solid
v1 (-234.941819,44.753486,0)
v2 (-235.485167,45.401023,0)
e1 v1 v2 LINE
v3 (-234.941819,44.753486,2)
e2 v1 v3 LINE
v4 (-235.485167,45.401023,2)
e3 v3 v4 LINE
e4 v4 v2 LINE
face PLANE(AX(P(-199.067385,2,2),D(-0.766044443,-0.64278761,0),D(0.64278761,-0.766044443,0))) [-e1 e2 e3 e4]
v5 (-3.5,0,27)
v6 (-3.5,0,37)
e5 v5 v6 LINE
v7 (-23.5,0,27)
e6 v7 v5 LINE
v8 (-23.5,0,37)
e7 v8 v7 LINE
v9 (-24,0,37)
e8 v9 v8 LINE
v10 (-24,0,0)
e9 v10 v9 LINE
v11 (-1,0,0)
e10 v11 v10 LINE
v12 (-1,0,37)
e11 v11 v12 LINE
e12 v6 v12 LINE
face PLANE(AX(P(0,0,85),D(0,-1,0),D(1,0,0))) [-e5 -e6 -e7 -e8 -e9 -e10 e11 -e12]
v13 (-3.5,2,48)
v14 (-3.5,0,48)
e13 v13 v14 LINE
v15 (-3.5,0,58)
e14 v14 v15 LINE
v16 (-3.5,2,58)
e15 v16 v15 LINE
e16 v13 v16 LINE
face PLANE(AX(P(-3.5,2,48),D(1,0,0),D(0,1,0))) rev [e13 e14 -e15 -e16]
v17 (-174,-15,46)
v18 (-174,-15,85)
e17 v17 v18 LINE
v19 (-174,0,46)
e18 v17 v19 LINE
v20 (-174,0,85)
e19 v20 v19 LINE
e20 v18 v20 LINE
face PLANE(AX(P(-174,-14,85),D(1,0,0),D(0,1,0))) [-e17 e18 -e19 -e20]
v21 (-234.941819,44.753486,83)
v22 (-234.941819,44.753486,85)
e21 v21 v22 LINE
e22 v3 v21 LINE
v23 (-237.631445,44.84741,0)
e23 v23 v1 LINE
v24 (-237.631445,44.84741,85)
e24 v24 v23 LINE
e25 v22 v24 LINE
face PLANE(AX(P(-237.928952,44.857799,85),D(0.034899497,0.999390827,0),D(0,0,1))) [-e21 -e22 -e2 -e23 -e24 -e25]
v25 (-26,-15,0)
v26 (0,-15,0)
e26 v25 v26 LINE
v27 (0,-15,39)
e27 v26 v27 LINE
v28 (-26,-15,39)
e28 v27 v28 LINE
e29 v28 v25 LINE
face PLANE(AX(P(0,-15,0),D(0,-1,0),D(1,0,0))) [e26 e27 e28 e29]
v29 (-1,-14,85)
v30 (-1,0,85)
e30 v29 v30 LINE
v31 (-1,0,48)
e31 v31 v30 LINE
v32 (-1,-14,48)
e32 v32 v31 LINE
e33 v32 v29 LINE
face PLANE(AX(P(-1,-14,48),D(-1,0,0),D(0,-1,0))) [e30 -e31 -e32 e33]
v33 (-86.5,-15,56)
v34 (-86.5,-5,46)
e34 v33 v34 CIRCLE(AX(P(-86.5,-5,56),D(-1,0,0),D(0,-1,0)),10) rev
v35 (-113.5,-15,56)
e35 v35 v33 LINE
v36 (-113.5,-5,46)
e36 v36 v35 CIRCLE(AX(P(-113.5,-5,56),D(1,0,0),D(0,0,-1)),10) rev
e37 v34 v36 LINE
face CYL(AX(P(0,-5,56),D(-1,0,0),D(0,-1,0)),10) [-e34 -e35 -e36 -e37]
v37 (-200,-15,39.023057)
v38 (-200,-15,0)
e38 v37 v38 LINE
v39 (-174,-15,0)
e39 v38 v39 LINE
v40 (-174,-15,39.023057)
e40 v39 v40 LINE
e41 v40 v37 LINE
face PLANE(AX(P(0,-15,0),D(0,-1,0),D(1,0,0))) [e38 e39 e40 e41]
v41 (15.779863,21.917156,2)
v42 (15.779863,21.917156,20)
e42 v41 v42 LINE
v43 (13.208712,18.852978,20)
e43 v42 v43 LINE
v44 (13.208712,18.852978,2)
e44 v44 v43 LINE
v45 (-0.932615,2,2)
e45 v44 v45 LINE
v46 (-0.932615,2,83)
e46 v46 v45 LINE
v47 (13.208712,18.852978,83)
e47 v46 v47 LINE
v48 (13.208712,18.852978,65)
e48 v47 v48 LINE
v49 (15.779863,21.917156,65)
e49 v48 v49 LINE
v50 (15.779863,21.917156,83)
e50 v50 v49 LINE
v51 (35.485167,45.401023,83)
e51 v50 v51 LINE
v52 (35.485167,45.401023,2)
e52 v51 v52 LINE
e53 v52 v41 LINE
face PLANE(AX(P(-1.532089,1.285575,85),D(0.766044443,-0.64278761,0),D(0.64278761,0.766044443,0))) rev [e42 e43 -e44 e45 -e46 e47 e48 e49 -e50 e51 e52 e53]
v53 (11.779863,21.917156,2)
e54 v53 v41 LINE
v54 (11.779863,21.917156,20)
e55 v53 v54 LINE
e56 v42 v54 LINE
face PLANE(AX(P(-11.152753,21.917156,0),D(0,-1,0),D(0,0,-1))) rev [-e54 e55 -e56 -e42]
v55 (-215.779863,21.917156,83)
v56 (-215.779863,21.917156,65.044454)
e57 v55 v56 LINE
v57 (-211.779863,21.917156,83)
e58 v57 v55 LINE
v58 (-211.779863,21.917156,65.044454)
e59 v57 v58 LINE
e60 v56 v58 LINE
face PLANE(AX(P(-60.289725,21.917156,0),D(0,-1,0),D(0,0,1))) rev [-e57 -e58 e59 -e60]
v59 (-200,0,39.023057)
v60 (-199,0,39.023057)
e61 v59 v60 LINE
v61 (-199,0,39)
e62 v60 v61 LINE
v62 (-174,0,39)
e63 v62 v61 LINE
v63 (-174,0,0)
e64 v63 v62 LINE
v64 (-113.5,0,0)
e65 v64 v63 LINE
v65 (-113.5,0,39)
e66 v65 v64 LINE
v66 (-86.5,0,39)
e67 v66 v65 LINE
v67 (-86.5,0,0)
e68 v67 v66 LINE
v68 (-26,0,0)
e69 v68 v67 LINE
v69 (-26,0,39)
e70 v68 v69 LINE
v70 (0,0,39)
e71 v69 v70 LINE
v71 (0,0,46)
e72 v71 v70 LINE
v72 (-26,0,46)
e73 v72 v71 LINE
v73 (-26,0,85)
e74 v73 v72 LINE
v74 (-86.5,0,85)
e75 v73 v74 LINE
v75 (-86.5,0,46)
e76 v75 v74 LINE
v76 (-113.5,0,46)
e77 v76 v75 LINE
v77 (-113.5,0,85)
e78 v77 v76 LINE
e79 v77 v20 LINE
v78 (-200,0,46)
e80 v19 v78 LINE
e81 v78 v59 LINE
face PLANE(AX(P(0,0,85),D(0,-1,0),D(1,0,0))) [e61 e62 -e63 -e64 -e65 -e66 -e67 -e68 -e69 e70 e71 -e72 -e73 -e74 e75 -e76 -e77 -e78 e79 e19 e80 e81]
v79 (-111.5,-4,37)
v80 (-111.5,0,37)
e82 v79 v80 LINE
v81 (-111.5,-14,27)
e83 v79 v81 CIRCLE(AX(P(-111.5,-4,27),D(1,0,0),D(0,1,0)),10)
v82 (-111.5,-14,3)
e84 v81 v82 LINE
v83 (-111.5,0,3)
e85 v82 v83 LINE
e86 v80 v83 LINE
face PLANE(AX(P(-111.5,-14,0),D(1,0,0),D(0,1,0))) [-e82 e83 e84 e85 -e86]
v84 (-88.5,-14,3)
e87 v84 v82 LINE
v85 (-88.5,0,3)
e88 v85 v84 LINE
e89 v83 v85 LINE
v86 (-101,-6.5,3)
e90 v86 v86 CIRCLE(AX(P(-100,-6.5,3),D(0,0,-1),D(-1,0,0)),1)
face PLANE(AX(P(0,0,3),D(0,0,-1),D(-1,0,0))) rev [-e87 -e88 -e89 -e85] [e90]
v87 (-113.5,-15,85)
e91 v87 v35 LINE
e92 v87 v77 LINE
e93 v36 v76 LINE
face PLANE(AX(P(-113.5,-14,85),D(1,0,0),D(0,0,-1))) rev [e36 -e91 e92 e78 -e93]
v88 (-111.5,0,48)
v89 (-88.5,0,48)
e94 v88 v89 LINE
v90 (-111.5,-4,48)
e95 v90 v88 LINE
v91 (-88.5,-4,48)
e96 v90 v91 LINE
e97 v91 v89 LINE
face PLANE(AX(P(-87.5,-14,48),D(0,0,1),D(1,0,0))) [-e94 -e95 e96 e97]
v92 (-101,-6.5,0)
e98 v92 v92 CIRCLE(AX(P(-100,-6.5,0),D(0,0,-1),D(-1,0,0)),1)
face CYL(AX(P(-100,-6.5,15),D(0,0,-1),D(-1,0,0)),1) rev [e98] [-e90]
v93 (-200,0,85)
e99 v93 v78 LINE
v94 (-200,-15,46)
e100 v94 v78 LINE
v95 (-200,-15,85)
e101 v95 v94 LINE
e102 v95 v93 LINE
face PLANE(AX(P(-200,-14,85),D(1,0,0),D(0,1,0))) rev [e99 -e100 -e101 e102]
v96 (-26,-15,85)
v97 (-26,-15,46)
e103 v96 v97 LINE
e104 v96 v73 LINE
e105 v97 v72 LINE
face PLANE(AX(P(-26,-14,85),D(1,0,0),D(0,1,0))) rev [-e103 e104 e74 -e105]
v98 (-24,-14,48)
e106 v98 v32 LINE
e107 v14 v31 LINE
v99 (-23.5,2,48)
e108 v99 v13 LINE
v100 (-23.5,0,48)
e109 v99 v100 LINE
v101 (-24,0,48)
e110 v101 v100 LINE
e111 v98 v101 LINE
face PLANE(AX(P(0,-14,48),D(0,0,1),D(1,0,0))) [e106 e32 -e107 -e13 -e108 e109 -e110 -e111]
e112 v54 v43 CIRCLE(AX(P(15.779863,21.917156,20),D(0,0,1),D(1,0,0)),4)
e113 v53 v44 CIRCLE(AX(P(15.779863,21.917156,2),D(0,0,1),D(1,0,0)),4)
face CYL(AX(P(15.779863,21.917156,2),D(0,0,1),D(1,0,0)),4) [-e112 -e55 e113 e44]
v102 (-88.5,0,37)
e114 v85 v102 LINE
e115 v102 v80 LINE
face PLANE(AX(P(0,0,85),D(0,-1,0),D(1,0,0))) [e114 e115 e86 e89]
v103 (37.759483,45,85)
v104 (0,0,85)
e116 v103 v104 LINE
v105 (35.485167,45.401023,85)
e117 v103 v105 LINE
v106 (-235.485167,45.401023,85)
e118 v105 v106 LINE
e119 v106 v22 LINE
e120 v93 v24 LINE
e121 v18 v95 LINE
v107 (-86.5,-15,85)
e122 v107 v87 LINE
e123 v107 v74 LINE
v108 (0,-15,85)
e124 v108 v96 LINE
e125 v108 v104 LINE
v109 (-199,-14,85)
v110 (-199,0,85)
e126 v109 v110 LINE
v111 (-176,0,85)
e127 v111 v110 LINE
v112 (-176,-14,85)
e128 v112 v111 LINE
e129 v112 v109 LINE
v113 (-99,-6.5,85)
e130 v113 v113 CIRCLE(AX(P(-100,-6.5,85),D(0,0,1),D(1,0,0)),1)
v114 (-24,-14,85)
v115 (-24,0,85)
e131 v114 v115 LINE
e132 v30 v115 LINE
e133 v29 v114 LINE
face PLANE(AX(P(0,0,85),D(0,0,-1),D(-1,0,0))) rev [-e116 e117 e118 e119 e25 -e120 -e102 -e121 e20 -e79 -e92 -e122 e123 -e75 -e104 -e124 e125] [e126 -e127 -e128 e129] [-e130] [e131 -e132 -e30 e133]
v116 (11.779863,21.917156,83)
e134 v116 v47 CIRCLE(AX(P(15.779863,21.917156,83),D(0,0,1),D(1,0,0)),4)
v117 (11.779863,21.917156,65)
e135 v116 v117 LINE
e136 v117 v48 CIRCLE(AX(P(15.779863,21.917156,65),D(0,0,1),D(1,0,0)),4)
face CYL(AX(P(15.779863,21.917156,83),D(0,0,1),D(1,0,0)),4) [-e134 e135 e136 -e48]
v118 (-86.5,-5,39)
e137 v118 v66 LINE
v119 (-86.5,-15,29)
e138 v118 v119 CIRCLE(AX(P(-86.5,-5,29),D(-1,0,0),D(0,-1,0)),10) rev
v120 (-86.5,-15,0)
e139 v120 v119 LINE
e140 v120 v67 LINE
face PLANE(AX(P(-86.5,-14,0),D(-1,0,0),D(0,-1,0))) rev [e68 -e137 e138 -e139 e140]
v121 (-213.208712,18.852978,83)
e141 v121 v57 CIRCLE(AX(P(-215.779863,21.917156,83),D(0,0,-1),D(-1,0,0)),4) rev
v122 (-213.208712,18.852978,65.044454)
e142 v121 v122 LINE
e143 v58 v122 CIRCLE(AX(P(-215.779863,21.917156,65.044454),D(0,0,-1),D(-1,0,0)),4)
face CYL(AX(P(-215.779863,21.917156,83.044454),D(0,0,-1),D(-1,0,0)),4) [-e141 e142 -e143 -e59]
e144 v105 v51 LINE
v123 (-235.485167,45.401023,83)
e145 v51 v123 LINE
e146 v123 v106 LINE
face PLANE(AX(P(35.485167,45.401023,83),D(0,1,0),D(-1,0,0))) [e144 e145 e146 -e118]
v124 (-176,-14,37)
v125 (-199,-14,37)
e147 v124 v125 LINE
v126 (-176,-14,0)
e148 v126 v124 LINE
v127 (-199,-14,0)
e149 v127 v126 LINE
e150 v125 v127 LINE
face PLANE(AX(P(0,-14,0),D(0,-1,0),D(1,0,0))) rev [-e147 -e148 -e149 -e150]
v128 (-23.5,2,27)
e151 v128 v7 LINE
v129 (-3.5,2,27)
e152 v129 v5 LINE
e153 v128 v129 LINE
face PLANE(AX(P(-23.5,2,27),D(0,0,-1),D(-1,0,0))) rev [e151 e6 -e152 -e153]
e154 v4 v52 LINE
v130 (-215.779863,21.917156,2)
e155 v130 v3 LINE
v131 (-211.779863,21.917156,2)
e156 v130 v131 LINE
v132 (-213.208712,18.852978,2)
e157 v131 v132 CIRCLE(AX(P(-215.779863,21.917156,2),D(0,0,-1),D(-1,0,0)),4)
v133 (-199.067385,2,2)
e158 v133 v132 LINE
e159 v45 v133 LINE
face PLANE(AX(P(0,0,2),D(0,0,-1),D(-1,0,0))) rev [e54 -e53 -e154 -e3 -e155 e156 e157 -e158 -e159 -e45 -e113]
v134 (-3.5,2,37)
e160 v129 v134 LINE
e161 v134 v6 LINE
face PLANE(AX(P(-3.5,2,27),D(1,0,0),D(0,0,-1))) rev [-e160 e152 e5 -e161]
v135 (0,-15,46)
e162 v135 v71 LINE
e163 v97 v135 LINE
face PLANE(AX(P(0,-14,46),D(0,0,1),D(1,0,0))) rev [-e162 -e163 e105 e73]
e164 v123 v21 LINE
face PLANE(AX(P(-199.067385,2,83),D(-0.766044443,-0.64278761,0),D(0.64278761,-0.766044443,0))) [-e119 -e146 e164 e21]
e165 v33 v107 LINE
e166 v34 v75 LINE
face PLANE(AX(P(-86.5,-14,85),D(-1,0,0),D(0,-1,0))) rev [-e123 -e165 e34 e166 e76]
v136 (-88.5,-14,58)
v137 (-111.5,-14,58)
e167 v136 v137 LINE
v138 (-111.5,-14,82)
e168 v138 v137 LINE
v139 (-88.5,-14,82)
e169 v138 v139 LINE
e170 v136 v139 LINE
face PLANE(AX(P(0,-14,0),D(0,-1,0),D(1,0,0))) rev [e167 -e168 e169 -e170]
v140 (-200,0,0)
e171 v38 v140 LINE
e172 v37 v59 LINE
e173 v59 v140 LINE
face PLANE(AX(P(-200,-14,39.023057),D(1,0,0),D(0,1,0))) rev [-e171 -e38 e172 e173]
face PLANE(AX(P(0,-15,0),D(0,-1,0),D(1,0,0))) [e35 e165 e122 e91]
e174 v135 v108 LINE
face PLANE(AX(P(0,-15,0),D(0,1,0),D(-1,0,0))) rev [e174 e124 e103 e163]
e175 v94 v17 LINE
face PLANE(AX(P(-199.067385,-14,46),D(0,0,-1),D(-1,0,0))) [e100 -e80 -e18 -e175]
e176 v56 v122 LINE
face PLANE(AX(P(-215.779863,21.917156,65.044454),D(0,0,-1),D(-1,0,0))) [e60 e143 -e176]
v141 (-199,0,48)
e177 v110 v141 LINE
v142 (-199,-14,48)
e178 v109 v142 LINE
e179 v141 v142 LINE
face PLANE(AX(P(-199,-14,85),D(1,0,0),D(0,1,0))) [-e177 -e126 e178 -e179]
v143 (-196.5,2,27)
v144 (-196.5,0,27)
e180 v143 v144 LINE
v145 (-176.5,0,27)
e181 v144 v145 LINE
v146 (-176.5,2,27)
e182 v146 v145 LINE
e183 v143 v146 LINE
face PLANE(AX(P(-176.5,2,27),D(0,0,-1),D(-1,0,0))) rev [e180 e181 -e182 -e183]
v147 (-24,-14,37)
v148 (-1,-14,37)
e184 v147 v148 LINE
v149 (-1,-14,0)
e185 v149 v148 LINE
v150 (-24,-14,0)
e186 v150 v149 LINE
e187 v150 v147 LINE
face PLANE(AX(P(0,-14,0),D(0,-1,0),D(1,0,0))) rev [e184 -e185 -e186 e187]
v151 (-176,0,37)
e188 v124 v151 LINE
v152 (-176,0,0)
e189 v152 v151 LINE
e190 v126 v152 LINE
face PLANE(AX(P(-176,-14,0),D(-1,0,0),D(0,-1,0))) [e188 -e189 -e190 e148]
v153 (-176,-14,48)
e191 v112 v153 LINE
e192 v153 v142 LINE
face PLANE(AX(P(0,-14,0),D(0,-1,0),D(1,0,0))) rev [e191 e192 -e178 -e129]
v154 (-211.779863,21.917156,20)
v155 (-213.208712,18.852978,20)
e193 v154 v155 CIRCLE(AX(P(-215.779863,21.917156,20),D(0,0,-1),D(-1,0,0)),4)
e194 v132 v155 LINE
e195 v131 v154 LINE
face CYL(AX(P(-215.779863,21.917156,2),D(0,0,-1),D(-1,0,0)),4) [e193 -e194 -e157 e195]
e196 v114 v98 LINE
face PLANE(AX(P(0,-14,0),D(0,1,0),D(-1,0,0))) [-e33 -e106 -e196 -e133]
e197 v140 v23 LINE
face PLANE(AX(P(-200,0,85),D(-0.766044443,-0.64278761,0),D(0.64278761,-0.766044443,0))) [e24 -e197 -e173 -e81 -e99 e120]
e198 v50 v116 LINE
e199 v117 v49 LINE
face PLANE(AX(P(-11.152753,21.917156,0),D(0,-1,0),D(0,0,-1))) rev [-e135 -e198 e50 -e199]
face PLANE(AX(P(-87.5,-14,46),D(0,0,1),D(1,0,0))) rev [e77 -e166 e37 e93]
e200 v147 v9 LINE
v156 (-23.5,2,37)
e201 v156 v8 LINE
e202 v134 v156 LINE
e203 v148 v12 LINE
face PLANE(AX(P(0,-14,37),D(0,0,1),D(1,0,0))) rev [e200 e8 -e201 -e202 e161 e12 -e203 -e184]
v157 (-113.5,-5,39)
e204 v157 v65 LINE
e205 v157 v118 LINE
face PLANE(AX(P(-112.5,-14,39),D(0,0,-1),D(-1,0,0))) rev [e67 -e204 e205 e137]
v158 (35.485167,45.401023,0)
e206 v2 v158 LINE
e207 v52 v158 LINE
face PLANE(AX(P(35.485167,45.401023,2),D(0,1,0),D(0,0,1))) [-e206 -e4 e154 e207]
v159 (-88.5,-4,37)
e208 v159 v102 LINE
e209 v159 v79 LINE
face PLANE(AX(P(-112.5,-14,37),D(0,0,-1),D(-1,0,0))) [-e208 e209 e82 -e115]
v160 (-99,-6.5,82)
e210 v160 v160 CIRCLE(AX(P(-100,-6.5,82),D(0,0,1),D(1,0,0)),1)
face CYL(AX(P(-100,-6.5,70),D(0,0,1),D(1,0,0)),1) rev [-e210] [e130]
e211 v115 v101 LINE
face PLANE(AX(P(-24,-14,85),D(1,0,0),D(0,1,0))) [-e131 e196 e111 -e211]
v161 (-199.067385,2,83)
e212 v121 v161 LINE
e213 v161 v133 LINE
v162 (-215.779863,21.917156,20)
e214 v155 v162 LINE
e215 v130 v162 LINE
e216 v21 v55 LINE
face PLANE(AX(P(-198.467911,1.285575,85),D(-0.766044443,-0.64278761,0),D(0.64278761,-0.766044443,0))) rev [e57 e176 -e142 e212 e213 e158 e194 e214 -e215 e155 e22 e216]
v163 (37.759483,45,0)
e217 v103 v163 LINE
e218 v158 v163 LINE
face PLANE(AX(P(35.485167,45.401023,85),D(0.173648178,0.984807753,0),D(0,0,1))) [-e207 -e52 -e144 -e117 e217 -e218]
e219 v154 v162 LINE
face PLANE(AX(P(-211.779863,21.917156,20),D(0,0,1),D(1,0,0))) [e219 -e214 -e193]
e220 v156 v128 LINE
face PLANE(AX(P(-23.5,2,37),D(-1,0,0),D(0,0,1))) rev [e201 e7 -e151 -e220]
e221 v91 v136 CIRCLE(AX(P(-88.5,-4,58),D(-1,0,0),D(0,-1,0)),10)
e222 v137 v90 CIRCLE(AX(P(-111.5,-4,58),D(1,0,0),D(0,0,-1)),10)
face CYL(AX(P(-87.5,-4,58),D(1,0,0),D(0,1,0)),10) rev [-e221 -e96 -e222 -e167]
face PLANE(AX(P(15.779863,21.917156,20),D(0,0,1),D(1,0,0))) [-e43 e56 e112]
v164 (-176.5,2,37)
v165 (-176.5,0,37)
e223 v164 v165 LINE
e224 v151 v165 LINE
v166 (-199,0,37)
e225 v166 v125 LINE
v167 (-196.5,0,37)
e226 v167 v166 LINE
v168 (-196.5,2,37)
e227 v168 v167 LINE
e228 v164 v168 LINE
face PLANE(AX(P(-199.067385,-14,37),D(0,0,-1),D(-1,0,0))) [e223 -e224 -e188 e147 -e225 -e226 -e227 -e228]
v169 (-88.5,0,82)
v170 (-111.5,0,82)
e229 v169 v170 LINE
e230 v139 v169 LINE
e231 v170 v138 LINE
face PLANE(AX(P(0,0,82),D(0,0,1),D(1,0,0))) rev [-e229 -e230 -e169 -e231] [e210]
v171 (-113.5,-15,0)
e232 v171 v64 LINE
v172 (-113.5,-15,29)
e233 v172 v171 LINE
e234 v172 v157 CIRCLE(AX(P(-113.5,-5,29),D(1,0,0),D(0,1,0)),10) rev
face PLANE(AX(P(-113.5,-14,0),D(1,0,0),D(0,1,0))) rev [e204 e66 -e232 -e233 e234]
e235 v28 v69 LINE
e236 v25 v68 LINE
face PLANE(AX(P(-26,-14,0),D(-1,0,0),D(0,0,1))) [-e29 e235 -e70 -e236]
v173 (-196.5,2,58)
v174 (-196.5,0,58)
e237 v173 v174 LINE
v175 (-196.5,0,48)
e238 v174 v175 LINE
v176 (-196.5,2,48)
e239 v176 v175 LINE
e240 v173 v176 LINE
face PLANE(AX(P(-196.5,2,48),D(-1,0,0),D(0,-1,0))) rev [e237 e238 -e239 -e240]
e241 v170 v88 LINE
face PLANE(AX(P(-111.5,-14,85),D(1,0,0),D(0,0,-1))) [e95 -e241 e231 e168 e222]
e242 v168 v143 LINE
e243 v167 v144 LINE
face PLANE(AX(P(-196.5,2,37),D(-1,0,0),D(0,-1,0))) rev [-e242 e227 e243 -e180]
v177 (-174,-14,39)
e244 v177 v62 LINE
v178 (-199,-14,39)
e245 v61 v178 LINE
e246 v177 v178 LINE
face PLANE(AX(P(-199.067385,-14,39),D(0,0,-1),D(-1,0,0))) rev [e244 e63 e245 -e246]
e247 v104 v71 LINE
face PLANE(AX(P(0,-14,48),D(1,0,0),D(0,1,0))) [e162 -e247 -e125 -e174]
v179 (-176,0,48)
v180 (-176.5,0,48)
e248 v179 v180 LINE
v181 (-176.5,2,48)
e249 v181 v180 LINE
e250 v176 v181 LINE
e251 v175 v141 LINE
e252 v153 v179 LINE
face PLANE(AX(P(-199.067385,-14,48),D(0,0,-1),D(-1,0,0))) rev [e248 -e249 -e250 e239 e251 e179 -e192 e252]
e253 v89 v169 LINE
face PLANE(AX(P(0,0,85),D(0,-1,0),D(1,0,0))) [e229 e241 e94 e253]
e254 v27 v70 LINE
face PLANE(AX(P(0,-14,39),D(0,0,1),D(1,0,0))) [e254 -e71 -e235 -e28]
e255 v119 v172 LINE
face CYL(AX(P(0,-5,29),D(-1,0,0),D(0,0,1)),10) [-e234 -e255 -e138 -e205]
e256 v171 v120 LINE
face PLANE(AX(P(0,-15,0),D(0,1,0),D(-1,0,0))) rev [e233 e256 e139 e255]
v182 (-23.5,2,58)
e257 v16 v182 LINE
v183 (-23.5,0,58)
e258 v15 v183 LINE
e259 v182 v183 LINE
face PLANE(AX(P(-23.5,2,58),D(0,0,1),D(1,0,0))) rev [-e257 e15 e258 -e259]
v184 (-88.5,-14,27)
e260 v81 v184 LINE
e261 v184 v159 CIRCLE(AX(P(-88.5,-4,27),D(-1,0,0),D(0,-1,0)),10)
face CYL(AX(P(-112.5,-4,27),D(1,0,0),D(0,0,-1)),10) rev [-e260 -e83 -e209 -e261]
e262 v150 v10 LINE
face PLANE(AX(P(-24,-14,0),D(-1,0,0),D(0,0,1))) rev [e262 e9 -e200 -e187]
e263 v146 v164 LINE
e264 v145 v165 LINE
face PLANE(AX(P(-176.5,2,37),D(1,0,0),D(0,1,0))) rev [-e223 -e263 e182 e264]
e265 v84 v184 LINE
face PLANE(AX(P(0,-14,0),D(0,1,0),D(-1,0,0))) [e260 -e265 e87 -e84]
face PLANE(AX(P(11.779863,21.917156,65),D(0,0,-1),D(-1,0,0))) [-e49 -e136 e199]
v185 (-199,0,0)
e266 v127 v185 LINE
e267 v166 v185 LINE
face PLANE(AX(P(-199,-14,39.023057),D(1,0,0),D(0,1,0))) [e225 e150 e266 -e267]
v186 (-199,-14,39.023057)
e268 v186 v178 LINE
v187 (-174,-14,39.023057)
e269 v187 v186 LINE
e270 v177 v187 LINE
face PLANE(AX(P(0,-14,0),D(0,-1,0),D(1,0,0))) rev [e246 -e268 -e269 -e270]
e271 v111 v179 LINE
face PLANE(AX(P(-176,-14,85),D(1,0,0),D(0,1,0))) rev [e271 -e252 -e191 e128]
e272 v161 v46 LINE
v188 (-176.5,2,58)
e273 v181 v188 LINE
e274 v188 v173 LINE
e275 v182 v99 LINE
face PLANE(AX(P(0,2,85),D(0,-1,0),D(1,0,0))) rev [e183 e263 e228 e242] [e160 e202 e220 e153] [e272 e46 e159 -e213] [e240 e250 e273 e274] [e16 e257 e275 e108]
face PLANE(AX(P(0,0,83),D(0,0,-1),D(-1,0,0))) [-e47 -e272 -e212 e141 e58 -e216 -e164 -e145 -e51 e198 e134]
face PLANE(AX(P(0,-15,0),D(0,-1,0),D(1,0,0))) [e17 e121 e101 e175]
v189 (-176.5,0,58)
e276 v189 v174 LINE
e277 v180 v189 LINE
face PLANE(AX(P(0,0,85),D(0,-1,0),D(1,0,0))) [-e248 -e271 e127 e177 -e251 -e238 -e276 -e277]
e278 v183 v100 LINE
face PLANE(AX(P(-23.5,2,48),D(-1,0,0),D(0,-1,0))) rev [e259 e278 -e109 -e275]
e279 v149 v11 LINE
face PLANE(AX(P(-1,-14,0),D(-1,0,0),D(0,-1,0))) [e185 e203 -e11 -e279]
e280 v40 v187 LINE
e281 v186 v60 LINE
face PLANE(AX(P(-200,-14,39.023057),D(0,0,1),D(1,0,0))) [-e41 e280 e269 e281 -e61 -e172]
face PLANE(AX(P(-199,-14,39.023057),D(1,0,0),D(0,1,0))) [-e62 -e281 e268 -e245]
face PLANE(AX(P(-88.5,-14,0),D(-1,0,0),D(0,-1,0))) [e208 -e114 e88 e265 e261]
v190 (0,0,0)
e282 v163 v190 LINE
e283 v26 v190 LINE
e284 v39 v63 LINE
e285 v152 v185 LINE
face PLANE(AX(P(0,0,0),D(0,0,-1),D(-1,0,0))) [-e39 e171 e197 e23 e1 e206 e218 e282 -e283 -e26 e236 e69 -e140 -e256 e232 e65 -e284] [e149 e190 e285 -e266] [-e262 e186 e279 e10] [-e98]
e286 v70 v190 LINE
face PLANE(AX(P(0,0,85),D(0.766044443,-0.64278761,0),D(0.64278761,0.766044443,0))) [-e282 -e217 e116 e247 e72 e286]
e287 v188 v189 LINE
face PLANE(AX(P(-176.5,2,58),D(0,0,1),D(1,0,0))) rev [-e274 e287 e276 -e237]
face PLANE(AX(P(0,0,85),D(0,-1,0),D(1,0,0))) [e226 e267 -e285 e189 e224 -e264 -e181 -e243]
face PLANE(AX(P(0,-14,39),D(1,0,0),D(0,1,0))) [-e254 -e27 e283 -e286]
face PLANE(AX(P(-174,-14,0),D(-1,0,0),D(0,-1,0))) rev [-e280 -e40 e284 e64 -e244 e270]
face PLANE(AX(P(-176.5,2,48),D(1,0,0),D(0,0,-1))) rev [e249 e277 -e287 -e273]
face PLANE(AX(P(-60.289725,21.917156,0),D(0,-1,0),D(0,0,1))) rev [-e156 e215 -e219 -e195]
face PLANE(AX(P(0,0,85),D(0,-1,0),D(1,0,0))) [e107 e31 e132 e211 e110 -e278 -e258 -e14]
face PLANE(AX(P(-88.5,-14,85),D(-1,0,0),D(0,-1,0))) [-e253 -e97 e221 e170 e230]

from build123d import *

# Parameters (mm, degrees)
EXTRU_MINCE3_DEPTH       = 85
EXTRU_MINCE4_DEPTH       = 14
ESQUISSE3_W              = 1
ESQUISSE3_H              = 39.023056592
EXTRU_MINCE5_DEPTH       = 14
ESQUISSE4_W              = 1
ESQUISSE4_H              = 39
EXTRU_MINCE6_DEPTH       = 14
ESQUISSE5_W              = 1
ESQUISSE5_H              = 37
EXTRU_MINCE7_DEPTH       = 14
ESQUISSE6_W              = 1
ESQUISSE6_H              = 37
EXTRU_MINCE8_DEPTH       = 14
ESQUISSE9_W              = 26
ESQUISSE9_H              = 39.023056592
ESQUISSE9_H_2            = 39
ESQUISSE9_W_2            = 27
BOSS_EXTRU_2_DEPTH       = 1
CONG_1_R                 = 10
CONG_2_R                 = 10
CONG_3_R                 = 10
CONG_4_R                 = 10
ESQUISSE10_W             = 23
ESQUISSE10_H             = 14
BOSS_EXTRU_3_DEPTH       = 3
ESQUISSE11_W             = 23
ESQUISSE11_H             = 14
BOSS_EXTRU_4_DEPTH       = 3
ESQUISSE14_R             = 1
ENL_V_MAT_EXTRU_2_DEPTH  = 15
ENL_V_START              = -15
ESQUISSE15_R             = 1
ENL_V_MAT_EXTRU_4_DEPTH  = 15
CHANFREIN2_SIZE2         = 1.154700538
CHANFREIN2_SIZE          = 2
CHANFREIN4_SIZE          = 2
CHANFREIN4_SIZE_2        = 2.22122503
BOSS_EXTRU_8_DEPTH       = 2
BOSS_EXTRU_9_DEPTH       = 2
ESQUISSE23_W             = 20
ESQUISSE23_H             = 10
ENL_V_MAT_EXTRU_7_DEPTH  = 2
ESQUISSE24_W             = 20
ESQUISSE24_H             = 10
ENL_V_MAT_EXTRU_9_DEPTH  = 2
ESQUISSE25_W             = 20
ESQUISSE25_H             = 10
ENL_V_MAT_EXTRU_11_DEPTH = 2
ESQUISSE26_W             = 20
ESQUISSE26_H             = 10
ENL_V_MAT_EXTRU_13_DEPTH = 2
ESQUISSE28_W             = 18
ESQUISSE28_H             = 4
R_VOL_MINCE9_ANGLE       = 50
ESQUISSE29_W             = 18
ESQUISSE29_H             = 4
R_VOL_MINCE10_ANGLE      = 50
ESQUISSE31_W             = 18
ESQUISSE31_H             = 4
R_VOL_MINCE11_ANGLE      = 50
ESQUISSE32_W             = 18
ESQUISSE32_H             = 4
R_VOL_MINCE12_ANGLE      = 50


# Some blends are built 0.0001 mm under size
with BuildPart() as part:
    # Esquisse1 → Extru.-Mince3 (new body)
    with BuildSketch(Plane.XY):
        Polygon((37.759483403, 45), (0, 0), (-200, 0), (-237.759483403, 45), (-236.227394517, 46.285575219), (-199.067384684, 2), (-0.932615316, 2), (36.227394517, 46.285575219), align=None)
    extrude(amount=EXTRU_MINCE3_DEPTH)

    # Esquisse2 → Extru.-Mince4 (add)
    with BuildSketch(Plane(origin=(0, 0, 0), x_dir=(-1, 0, 0), z_dir=(0, -1, 0))):
        Polygon((199.067384684, -46), (174, -46), (174, -85), (176, -85), (176, -48), (199.067384684, -48), align=None)
        Polygon((0, -48), (24, -48), (24, -85), (26, -85), (26, -46), (0, -46), align=None)
        Polygon((88.5, -85), (88.5, -48), (111.5, -48), (111.5, -85), (113.5, -85), (113.5, -46), (86.5, -46), (86.5, -85), align=None)
        Polygon((199.067384684, -37), (176, -37), (176, 0), (174, 0), (174, -39), (199.067384684, -39), align=None)
        Polygon((111.5, 0), (111.5, -37), (88.5, -37), (88.5, 0), (86.5, 0), (86.5, -39), (113.5, -39), (113.5, 0), align=None)
        Polygon((0, -39), (26, -39), (26, 0), (24, 0), (24, -37), (0, -37), align=None)
    extrude(amount=EXTRU_MINCE4_DEPTH)

    # Esquisse3 → Extru.-Mince5 (add)
    with BuildSketch(Plane(origin=(0, 0, 0), x_dir=(-1, 0, 0), z_dir=(0, -1, 0))):
        with Locations((199.5, -19.511528296)):
            Rectangle(ESQUISSE3_W, ESQUISSE3_H)
    extrude(amount=EXTRU_MINCE5_DEPTH)

    # Esquisse4 → Extru.-Mince6 (add)
    with BuildSketch(Plane.XZ):
        with Locations((-199.5, 65.5)):
            Rectangle(ESQUISSE4_W, ESQUISSE4_H)
    extrude(amount=EXTRU_MINCE6_DEPTH)

    # Esquisse5 → Extru.-Mince7 (add)
    with BuildSketch(Plane(origin=(0, 0, 0), x_dir=(-1, 0, 0), z_dir=(0, -1, 0))):
        with Locations((0.5, -18.5)):
            Rectangle(ESQUISSE5_W, ESQUISSE5_H)
    extrude(amount=EXTRU_MINCE7_DEPTH)

    # Esquisse6 → Extru.-Mince8 (add)
    with BuildSketch(Plane(origin=(0, 0, 0), x_dir=(-1, 0, 0), z_dir=(0, -1, 0))):
        with Locations((0.5, -66.5)):
            Rectangle(ESQUISSE6_W, ESQUISSE6_H)
    extrude(amount=EXTRU_MINCE8_DEPTH)

    # Esquisse9 → Boss.-Extru.2 (add)
    with BuildSketch(Plane(origin=(0, -14, 0), x_dir=(-1, 0, 0), z_dir=(0, -1, 0))):
        with Locations((187, -19.511528296)):
            Rectangle(ESQUISSE9_W, ESQUISSE9_H)
        with Locations((187, -65.5)):
            Rectangle(ESQUISSE9_W, ESQUISSE9_H_2)
        with Locations((100, -65.5)):
            Rectangle(ESQUISSE9_W_2, ESQUISSE9_H_2)
        with Locations((100, -19.5)):
            Rectangle(ESQUISSE9_W_2, ESQUISSE9_H_2)
        with Locations((13, -65.5)):
            Rectangle(ESQUISSE9_W, ESQUISSE9_H_2)
        with Locations((13, -19.5)):
            Rectangle(ESQUISSE9_W, ESQUISSE9_H_2)
    extrude(amount=BOSS_EXTRU_2_DEPTH)

    # Congé1
    cong_1_edges = [part.edges().sort_by_distance(p)[0] for p in [
        (-100, -15, 39),
    ]]
    fillet(cong_1_edges, radius=CONG_1_R)

    # Congé2
    cong_2_edges = [part.edges().sort_by_distance(p)[0] for p in [
        (-100, -14, 37),
    ]]
    fillet(cong_2_edges, radius=CONG_2_R)

    # Congé3
    cong_3_edges = [part.edges().sort_by_distance(p)[0] for p in [
        (-100, -15, 46),
    ]]
    fillet(cong_3_edges, radius=CONG_3_R)

    # Congé4
    cong_4_edges = [part.edges().sort_by_distance(p)[0] for p in [
        (-100, -14, 48),
    ]]
    fillet(cong_4_edges, radius=CONG_4_R)

    # Esquisse10 → Boss.-Extru.3 (add)
    with BuildSketch(Plane.XY.offset(85)):
        with Locations((-100, -7)):
            Rectangle(ESQUISSE10_W, ESQUISSE10_H)
    extrude(amount=-BOSS_EXTRU_3_DEPTH)

    # Esquisse11 → Boss.-Extru.4 (add)
    with BuildSketch(Plane(origin=(0, 0, 0), x_dir=(-1, 0, 0), z_dir=(0, 0, -1))):
        with Locations((100, -7)):
            Rectangle(ESQUISSE11_W, ESQUISSE11_H)
    extrude(amount=-BOSS_EXTRU_4_DEPTH)

    # Esquisse14 → Enlèv. mat.-Extru.2 (cut)
    with BuildSketch(Plane(origin=(0, 0, 0), x_dir=(-1, 0, 0), z_dir=(0, 0, -1))):
        with Locations((100, -6.5)):
            Circle(ESQUISSE14_R)
    extrude(amount=-ENL_V_MAT_EXTRU_2_DEPTH, mode=Mode.SUBTRACT)

    # Esquisse15 → Enlèv. mat.-Extru.4 (cut)
    with BuildSketch(Plane.XY.offset(85).offset(ENL_V_START)):
        with Locations(Location((-100, -6.5, 0), (0, 0, 180))):
            Circle(ESQUISSE15_R)
    extrude(amount=ENL_V_MAT_EXTRU_4_DEPTH, mode=Mode.SUBTRACT)

    # Chanfrein2
    chanfrein2_edges = [part.edges().sort_by_distance(p)[0] for p in [
        (36.227394517, 46.285575219, 42.5),
    ]]
    chanfrein2_side = [part.faces().sort_by_distance(p)[0] for p in [
        (36.245085555, 46.270730675, 42.5),
    ]]
    chamfer(chanfrein2_edges, length=CHANFREIN2_SIZE - 0.0001, length2=CHANFREIN2_SIZE2 - 0.0001, reference=chanfrein2_side[0])  # a hair under: the kernel refuses the full size

    # Chanfrein4
    # the kernel refuses this chamfer: 2.22122503, 2 mm, written as the material it takes off along each edge
    with BuildSketch(Plane(origin=(-236.227394517, 46.285575219, -5.720063061), x_dir=(0.6670048935936307, -0.7450533349513642, 0), z_dir=(0, 0, 1))) as chanfrein4_piece_1:
        Polygon((CHANFREIN4_SIZE * 0.999486448269, -CHANFREIN4_SIZE * 0.0320443400082), (-CHANFREIN4_SIZE_2 * 0.0320443400033, -CHANFREIN4_SIZE_2 * 0.999486448115), (0, 0), align=None)
    extrude(amount=96.440126123, mode=Mode.SUBTRACT)

    # Esquisse17 → Boss.-Extru.8 (add)
    with BuildSketch(Plane.XY.offset(85)):
        Polygon((35.485167318, 45.401023288), (-235.485167318, 45.401023288), (-199.067384684, 2), (-0.932615316, 2), align=None)
    extrude(amount=-BOSS_EXTRU_8_DEPTH)

    # Esquisse18 → Boss.-Extru.9 (add)
    with BuildSketch(Plane(origin=(0, 0, 0), x_dir=(-1, 0, 0), z_dir=(0, 0, -1))):
        Polygon((-35.485167318, 45.401023288), (235.485167318, 45.401023288), (199.067384684, 2), (0.932615316, 2), align=None)
    extrude(amount=-BOSS_EXTRU_9_DEPTH)

    # Esquisse23 → Enlèv. mat.-Extru.7 (cut)
    with BuildSketch(Plane(origin=(0, 0, 0), x_dir=(-1, 0, 0), z_dir=(0, -1, 0))):
        with Locations((13.5, -32)):
            Rectangle(ESQUISSE23_W, ESQUISSE23_H)
    extrude(amount=-ENL_V_MAT_EXTRU_7_DEPTH, mode=Mode.SUBTRACT)

    # Esquisse24 → Enlèv. mat.-Extru.9 (cut)
    with BuildSketch(Plane.XZ):
        with Locations((-13.5, 53)):
            Rectangle(ESQUISSE24_W, ESQUISSE24_H)
    extrude(amount=-ENL_V_MAT_EXTRU_9_DEPTH, mode=Mode.SUBTRACT)

    # Esquisse25 → Enlèv. mat.-Extru.11 (cut)
    with BuildSketch(Plane(origin=(0, 0, 0), x_dir=(-1, 0, 0), z_dir=(0, -1, 0))):
        with Locations((186.5, -53)):
            Rectangle(ESQUISSE25_W, ESQUISSE25_H)
    extrude(amount=-ENL_V_MAT_EXTRU_11_DEPTH, mode=Mode.SUBTRACT)

    # Esquisse26 → Enlèv. mat.-Extru.13 (cut)
    with BuildSketch(Plane(origin=(0, 0, 0), x_dir=(-1, 0, 0), z_dir=(0, -1, 0))):
        with Locations((186.5, -32)):
            Rectangle(ESQUISSE26_W, ESQUISSE26_H)
    extrude(amount=-ENL_V_MAT_EXTRU_13_DEPTH, mode=Mode.SUBTRACT)

    # Esquisse28 → Révol.-Mince9 (revolve)
    with BuildSketch(Plane(origin=(-115.83272888, -97.195200082, 0), x_dir=(0, 0, -1), z_dir=(0.7660444431189792, 0.6427876096865379, 0))):
        with Locations((-74.044453546, 153.490137254)):
            Rectangle(ESQUISSE28_W, ESQUISSE28_H)
    revolve(axis=Axis((-215.779862536, 21.917155521, 83.044453546), (0, 0, 1)), revolution_arc=R_VOL_MINCE9_ANGLE)

    # Esquisse29 → Révol.-Mince10 (revolve)
    with BuildSketch(Plane(origin=(-115.83272888, -97.195200082, 0), x_dir=(0, 0, -1), z_dir=(0.7660444431189792, 0.6427876096865379, 0))):
        with Locations((-11, 153.490137254)):
            Rectangle(ESQUISSE29_W, ESQUISSE29_H)
    revolve(axis=Axis((-215.779862536, 21.917155521, 2), (0, 0, 1)), revolution_arc=R_VOL_MINCE10_ANGLE)

    # Esquisse31 → Révol.-Mince11 (revolve)
    with BuildSketch(Plane(origin=(-1.532088886, 1.285575219, 0), x_dir=(0, 0, 1), z_dir=(-0.7660444431189749, 0.642787609686543, 0))):
        with Locations((11, 24.932615316)):
            Rectangle(ESQUISSE31_W, ESQUISSE31_H)
    revolve(axis=Axis((15.779862536, 21.917155521, 2), (0, 0, -1)), revolution_arc=R_VOL_MINCE11_ANGLE)

    # Esquisse32 → Révol.-Mince12 (revolve)
    with BuildSketch(Plane(origin=(-1.532088886, 1.285575219, 0), x_dir=(0, 0, 1), z_dir=(-0.7660444431189749, 0.642787609686543, 0))):
        with Locations((74, 24.932615316)):
            Rectangle(ESQUISSE32_W, ESQUISSE32_H)
    revolve(axis=Axis((15.779862536, 21.917155521, 83), (0, 0, -1)), revolution_arc=R_VOL_MINCE12_ANGLE)


solid = part.part
